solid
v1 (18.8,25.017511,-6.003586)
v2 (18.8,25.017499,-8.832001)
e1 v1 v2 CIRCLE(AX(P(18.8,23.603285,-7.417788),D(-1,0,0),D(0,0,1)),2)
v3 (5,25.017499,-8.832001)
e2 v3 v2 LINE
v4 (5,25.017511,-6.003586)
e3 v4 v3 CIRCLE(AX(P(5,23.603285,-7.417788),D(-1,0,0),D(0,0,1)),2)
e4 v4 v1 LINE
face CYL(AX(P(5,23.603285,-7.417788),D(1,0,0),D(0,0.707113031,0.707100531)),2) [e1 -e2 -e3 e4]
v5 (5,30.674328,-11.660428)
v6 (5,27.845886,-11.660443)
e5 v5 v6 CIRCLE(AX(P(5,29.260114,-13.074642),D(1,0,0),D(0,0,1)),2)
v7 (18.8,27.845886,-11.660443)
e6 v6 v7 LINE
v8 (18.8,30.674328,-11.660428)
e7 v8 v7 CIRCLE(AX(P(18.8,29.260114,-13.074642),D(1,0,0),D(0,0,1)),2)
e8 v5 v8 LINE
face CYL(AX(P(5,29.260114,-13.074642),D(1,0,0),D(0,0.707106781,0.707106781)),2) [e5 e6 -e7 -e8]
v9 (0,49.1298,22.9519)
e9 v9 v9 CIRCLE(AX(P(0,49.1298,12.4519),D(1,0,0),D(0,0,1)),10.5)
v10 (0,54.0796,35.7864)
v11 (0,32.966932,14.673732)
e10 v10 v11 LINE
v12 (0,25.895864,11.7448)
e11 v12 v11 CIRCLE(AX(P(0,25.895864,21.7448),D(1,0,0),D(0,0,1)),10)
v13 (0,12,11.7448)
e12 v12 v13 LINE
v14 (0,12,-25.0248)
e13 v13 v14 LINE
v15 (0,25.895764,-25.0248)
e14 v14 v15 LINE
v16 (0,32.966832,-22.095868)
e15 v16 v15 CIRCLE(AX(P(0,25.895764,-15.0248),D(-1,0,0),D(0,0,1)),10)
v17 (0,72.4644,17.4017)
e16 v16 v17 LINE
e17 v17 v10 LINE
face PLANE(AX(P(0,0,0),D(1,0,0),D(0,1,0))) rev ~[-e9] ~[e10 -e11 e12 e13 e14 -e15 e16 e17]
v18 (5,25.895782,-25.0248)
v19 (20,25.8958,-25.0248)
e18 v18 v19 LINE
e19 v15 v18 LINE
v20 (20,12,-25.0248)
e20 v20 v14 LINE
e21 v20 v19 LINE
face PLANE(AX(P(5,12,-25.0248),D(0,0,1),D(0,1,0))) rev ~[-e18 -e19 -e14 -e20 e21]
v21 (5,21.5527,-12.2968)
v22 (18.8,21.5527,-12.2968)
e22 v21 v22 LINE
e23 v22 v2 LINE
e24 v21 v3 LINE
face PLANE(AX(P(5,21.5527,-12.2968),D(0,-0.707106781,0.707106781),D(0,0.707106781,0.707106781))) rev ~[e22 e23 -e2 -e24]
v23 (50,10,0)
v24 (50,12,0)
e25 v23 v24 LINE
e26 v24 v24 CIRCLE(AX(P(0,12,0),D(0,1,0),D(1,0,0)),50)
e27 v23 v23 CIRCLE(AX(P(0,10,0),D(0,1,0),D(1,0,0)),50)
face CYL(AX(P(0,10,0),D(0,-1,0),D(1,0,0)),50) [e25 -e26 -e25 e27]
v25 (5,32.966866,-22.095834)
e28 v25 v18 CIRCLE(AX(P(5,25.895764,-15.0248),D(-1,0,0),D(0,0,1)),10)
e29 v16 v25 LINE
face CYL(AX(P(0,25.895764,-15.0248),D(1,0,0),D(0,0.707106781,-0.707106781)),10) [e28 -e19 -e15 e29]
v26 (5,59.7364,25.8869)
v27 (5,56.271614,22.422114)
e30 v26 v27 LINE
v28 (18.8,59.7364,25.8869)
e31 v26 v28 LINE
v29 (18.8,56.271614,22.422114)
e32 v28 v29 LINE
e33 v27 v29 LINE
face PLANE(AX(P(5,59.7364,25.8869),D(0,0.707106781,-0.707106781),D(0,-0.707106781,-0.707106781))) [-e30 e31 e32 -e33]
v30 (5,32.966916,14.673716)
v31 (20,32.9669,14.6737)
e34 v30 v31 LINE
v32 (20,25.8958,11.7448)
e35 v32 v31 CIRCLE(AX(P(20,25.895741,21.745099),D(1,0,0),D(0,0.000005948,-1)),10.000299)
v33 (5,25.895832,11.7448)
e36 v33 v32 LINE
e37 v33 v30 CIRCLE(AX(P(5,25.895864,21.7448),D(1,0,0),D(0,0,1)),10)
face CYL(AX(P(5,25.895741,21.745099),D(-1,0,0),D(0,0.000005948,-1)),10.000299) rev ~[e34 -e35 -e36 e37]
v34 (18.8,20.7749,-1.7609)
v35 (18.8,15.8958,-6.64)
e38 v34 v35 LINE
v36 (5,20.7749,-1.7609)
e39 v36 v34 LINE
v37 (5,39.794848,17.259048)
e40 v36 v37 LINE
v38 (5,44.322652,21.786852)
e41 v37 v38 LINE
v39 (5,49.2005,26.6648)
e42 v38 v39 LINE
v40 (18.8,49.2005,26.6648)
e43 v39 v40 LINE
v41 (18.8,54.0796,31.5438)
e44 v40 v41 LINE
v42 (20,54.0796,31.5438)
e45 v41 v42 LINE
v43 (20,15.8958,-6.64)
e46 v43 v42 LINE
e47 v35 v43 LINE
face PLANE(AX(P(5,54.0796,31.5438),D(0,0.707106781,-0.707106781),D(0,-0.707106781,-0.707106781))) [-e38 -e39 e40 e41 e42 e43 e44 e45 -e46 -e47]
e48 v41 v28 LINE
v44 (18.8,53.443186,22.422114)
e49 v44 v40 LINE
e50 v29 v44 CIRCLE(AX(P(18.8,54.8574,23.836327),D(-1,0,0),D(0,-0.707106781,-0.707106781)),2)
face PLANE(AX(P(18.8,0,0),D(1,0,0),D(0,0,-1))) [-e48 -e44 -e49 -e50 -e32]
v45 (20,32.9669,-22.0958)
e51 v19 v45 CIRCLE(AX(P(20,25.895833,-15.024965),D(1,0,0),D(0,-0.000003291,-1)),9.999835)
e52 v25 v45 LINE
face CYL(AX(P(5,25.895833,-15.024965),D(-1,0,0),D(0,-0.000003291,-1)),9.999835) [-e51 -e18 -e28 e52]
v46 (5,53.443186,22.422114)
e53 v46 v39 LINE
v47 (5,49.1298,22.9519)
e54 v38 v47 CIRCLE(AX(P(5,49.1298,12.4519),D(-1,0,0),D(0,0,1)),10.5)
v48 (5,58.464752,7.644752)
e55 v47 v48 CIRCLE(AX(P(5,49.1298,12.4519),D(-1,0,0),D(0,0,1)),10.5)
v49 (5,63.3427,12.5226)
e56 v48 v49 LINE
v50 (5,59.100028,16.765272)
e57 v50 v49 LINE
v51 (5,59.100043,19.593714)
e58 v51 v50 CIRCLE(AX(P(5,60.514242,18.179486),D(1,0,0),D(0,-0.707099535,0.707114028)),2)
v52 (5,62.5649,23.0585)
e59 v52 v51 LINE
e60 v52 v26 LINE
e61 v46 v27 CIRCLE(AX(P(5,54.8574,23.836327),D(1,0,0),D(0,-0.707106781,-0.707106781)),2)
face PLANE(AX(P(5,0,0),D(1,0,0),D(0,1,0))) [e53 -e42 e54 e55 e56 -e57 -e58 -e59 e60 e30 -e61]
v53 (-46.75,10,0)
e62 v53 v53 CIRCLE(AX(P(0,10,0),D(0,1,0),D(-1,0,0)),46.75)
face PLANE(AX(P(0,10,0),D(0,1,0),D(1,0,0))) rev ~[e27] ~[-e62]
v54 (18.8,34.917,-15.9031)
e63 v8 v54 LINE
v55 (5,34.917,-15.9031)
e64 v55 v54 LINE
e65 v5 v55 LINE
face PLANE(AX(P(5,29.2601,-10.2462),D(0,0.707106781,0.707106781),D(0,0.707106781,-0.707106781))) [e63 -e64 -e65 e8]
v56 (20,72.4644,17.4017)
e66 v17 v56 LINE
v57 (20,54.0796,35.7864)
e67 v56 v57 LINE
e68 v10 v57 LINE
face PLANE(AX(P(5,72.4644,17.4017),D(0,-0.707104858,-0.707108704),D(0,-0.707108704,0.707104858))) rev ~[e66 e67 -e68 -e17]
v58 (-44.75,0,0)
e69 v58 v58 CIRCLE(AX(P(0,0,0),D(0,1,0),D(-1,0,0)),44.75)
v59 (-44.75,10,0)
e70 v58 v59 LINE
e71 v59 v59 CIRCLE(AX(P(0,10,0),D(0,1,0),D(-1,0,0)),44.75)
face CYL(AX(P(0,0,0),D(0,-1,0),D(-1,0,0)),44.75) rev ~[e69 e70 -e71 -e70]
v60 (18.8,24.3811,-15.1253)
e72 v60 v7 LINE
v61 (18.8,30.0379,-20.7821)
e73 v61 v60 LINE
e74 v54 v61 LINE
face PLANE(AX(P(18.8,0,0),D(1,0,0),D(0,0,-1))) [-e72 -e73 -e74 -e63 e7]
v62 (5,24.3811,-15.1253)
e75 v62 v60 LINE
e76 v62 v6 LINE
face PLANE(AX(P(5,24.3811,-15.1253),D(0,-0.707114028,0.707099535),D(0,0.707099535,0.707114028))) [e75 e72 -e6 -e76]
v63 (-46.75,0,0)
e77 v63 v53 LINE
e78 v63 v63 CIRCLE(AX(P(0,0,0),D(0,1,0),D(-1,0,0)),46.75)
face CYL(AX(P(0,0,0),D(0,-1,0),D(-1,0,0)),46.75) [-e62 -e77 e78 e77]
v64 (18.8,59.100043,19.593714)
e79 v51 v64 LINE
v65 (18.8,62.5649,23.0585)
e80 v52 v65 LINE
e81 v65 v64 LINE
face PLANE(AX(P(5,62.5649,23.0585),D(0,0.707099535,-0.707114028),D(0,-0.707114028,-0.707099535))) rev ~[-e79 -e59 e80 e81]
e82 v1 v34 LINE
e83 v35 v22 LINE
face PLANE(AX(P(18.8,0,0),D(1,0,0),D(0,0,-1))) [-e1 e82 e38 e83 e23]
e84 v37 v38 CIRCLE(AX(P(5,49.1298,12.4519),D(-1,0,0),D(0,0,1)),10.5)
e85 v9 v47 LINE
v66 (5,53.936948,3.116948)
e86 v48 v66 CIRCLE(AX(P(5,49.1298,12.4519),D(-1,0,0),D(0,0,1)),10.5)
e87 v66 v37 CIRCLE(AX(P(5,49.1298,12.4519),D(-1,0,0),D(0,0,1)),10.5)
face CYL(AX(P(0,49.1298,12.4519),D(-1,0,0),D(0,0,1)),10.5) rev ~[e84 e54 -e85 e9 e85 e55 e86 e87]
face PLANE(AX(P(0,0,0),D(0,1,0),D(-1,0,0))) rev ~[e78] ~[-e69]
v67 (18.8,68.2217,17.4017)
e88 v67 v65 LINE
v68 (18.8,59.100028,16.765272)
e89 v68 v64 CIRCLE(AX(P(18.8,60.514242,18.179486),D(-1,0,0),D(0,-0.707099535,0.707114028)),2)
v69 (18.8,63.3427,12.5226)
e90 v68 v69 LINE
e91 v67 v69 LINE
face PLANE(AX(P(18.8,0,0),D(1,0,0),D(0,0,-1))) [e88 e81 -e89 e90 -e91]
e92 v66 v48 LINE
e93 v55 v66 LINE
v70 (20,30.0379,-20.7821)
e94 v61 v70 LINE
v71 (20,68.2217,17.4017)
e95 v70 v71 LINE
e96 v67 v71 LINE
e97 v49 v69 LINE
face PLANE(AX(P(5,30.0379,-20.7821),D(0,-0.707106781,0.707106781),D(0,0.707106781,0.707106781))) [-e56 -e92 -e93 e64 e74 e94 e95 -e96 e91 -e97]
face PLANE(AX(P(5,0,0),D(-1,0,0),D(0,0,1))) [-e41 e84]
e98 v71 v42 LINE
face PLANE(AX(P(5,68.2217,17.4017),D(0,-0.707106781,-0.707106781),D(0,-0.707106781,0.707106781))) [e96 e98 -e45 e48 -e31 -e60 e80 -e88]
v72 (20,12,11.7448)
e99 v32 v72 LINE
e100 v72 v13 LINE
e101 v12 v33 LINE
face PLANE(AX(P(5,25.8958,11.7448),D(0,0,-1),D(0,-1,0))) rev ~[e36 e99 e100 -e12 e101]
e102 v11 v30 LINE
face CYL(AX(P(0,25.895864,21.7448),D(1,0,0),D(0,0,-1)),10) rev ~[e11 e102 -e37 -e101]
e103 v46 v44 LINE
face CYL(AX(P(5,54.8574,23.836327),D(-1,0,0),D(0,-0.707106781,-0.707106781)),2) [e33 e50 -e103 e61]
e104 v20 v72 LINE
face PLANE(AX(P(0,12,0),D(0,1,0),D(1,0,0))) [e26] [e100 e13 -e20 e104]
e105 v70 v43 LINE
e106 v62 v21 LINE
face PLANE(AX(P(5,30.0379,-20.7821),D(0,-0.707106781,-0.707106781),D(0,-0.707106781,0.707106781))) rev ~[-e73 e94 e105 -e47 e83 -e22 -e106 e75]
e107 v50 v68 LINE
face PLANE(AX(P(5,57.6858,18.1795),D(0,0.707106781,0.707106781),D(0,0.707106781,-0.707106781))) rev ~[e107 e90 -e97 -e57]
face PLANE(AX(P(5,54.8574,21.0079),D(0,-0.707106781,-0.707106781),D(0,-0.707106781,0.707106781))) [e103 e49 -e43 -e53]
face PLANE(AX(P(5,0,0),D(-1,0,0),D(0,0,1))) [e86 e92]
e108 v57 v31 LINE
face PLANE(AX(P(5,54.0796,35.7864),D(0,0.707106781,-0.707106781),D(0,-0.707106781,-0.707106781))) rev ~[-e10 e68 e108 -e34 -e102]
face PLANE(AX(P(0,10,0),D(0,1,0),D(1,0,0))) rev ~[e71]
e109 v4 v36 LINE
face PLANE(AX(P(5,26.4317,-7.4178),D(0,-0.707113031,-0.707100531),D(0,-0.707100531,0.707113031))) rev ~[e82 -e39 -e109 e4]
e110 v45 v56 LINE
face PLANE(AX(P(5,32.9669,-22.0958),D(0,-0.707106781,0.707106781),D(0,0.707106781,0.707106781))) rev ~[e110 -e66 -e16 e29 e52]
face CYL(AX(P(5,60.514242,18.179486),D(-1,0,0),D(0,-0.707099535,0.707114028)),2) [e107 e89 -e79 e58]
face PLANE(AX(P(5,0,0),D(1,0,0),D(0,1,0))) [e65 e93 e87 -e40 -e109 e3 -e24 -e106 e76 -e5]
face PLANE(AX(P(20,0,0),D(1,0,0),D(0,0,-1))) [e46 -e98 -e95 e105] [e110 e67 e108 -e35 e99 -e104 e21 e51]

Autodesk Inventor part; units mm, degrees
ref_plane "YZ Plane" through (0, 0, 0) normal (1, 0, 0) x (0, 1, 0)
ref_plane "XZ Plane" through (0, 0, 0) normal (0, 1, 0) x (-1, 0, 0)
ref_plane "XY Plane" through (0, 0, 0) normal (0, 0, 1) x (1, 0, 0)
sketch "草圖1" plane through (0, 0, 0) normal (0, 1, 0) x (-1, 0, 0)
  circle A0 centre (0, 0) radius 46.75
  circle A1 centre (0, 0) radius 44.75
  dimension "d0" = 93.5
  dimension "d1" = 2
extrude "擠出1" add sketch "草圖1" along normal blind 10
sketch "草圖2" plane through (0, 10, 0) normal (0, 1, 0) x (1, 0, 0)
  circle A0 centre (0, 0) radius 50
  dimension "d4" = 100
extrude "擠出2" add sketch "草圖2" along normal blind 2
sketch "草圖4" plane through (0, 0, 0) normal (1, 0, 0) x (0, 1, 0)
  line L0 (12, -50) -> (12, 50) projected
  line L1 (12, -25.0248) -> (30.0379, -25.0248)
  line L2 (30.0379, -25.0248) -> (30.0379, 11.7448)
  line L3 (30.0379, 11.7448) -> (12, 11.7448)
  line L4 (12, 11.7448) -> (12, -25.0248)
  line L5 (30.0379, -25.0248) -> (72.4644, 17.4017)
  line L6 (72.4644, 17.4017) -> (54.0796, 35.7864)
  line L7 (54.0796, 35.7864) -> (11.6532, -6.64)
  line L8 (11.6532, -6.64) -> (30.0379, -25.0248)
  point P0 (0, 0)
  dimension "d12" = 45
  dimension "d13" = 26
  dimension "d14" = 60
extrude "擠出4" add sketch "草圖4" along normal blind 5
fillet "圓角1" radius 10 1 edges at (2.5, 30.0379, 11.7448)
fillet "圓角2" radius 10 1 edges at (2.5, 30.0379, -25.0248)
sketch "草圖5" plane through (5, 0, 0) normal (1, 0, 0) x (0, 0, -1)
  line L0 (22.0958, 32.9669) -> (-17.4017, 72.4644) projected
  line L1 (-17.4017, 72.4644) -> (-35.7864, 54.0796) projected
  line L2 (-35.7864, 54.0796) -> (-14.6737, 32.9669) projected
  line L3 (20.7821, 30.0379) -> (-17.4017, 68.2217)
  line L4 (-17.4017, 68.2217) -> (-31.5438, 54.0796)
  line L5 (-31.5438, 54.0796) -> (-12.5524, 35.0882)
  line L6 (-31.5438, 54.0796) -> (-17.4017, 68.2217)
  line L7 (-17.4017, 68.2217) -> (20.7821, 30.0379)
  line L8 (20.7821, 30.0379) -> (6.64, 15.8958)
  line L9 (6.64, 15.8958) -> (-31.5438, 54.0796)
  arc A0 (25.0248, 25.8958) -> (22.0958, 32.9669) centre (15.0248, 25.8958) ccw projected
  line L10 (22.0958, 32.9669) -> (-17.4017, 72.4644) projected
  line L11 (-17.4017, 72.4644) -> (-35.7864, 54.0796) projected
  line L12 (-35.7864, 54.0796) -> (-14.6737, 32.9669) projected
  arc A1 (-11.7448, 25.8958) -> (-14.6737, 32.9669) centre (-21.7448, 25.8958) ccw projected
  line L13 (-11.7448, 25.8958) -> (-11.7448, 12) projected
  line L14 (25.0248, 12) -> (-11.7448, 12) projected
  line L15 (25.0248, 12) -> (25.0248, 25.8958) projected
  point P0 (0, 0)
  dimension "d19" = 20
  dimension "d20" = 54
  dimension "d21" = 54
extrude "擠出5" add sketch "草圖5" along normal blind 15
sketch "草圖6" plane through (0, 0, 0) normal (-1, 0, 0) x (0, 0, 1)
  circle A0 centre (12.4519, 49.1298) radius 10.5
  line L0 (12.4519, 49.1298) -> (26.594, 63.272)
  line L1 (17.4017, 72.4644) -> (35.7864, 54.0796) projected
  line L2 (-6.64, 15.8958) -> (-20.7821, 30.0379) projected
  point P0 (0, 0)
  dimension "d24" = 37
  dimension "d25" = 21
extrude "擠出6" cut sketch "草圖6" against normal blind 5
sketch "草圖7" plane through (5, 0, 0) normal (1, 0, 0) x (0, 0, -1)
  line L0 (-17.4017, 68.2217) -> (20.7821, 30.0379) projected
  line L1 (15.9031, 34.917) -> (20.7821, 30.0379)
  line L2 (20.7821, 30.0379) -> (15.1253, 24.3811)
  line L3 (15.1253, 24.3811) -> (10.2462, 29.2601)
  line L4 (10.2462, 29.2601) -> (15.9031, 34.917)
  point P0 (0, 0)
  dimension "d28" = 8
  dimension "d29" = 6.9
extrude "擠出7" add sketch "草圖7" along normal blind 13.8
sketch "草圖8" plane through (5, 0, 0) normal (1, 0, 0) x (0, 0, -1)
  line L0 (-17.2591, 39.7949) -> (6.64, 15.8958) projected
  line L1 (1.7609, 20.7749) -> (6.64, 15.8958)
  line L2 (6.64, 15.8958) -> (12.2968, 21.5527)
  line L3 (12.2968, 21.5527) -> (7.4178, 26.4317)
  line L4 (7.4178, 26.4317) -> (1.7609, 20.7749)
  point P0 (0, 0)
  dimension "d32" = 8
  dimension "d33" = 6.9
extrude "擠出8" add sketch "草圖8" along normal blind 13.8
sketch "草圖9" plane through (5, 0, 0) normal (1, 0, 0) x (0, 0, -1)
  line L0 (-17.4017, 68.2217) -> (20.7821, 30.0379) projected
  line L1 (-12.5226, 63.3427) -> (-17.4017, 68.2217)
  line L2 (-17.4017, 68.2217) -> (-23.0585, 62.5649)
  line L3 (-23.0585, 62.5649) -> (-18.1795, 57.6858)
  line L4 (-18.1795, 57.6858) -> (-12.5226, 63.3427)
  line L5 (6.64, 15.8958) -> (-31.5438, 54.0796) projected
  line L6 (-26.6648, 49.2005) -> (-31.5438, 54.0796)
  line L7 (-31.5438, 54.0796) -> (-25.8869, 59.7364)
  line L8 (-25.8869, 59.7364) -> (-21.0079, 54.8574)
  line L9 (-21.0079, 54.8574) -> (-26.6648, 49.2005)
  point P0 (0, 0)
  dimension "d36" = 8
  dimension "d37" = 8
  dimension "d38" = 6.9
extrude "擠出9" add sketch "草圖9" along normal blind 13.8
fillet "圓角3" radius 2 2 edges at (11.9, 54.8574, 21.0079) (11.9, 57.6858, 18.1795)
fillet "圓角4" radius 2 2 edges at (11.9, 26.4317, -7.4178) (11.9, 29.2601, -10.2462)
properties part number "第一關節"
